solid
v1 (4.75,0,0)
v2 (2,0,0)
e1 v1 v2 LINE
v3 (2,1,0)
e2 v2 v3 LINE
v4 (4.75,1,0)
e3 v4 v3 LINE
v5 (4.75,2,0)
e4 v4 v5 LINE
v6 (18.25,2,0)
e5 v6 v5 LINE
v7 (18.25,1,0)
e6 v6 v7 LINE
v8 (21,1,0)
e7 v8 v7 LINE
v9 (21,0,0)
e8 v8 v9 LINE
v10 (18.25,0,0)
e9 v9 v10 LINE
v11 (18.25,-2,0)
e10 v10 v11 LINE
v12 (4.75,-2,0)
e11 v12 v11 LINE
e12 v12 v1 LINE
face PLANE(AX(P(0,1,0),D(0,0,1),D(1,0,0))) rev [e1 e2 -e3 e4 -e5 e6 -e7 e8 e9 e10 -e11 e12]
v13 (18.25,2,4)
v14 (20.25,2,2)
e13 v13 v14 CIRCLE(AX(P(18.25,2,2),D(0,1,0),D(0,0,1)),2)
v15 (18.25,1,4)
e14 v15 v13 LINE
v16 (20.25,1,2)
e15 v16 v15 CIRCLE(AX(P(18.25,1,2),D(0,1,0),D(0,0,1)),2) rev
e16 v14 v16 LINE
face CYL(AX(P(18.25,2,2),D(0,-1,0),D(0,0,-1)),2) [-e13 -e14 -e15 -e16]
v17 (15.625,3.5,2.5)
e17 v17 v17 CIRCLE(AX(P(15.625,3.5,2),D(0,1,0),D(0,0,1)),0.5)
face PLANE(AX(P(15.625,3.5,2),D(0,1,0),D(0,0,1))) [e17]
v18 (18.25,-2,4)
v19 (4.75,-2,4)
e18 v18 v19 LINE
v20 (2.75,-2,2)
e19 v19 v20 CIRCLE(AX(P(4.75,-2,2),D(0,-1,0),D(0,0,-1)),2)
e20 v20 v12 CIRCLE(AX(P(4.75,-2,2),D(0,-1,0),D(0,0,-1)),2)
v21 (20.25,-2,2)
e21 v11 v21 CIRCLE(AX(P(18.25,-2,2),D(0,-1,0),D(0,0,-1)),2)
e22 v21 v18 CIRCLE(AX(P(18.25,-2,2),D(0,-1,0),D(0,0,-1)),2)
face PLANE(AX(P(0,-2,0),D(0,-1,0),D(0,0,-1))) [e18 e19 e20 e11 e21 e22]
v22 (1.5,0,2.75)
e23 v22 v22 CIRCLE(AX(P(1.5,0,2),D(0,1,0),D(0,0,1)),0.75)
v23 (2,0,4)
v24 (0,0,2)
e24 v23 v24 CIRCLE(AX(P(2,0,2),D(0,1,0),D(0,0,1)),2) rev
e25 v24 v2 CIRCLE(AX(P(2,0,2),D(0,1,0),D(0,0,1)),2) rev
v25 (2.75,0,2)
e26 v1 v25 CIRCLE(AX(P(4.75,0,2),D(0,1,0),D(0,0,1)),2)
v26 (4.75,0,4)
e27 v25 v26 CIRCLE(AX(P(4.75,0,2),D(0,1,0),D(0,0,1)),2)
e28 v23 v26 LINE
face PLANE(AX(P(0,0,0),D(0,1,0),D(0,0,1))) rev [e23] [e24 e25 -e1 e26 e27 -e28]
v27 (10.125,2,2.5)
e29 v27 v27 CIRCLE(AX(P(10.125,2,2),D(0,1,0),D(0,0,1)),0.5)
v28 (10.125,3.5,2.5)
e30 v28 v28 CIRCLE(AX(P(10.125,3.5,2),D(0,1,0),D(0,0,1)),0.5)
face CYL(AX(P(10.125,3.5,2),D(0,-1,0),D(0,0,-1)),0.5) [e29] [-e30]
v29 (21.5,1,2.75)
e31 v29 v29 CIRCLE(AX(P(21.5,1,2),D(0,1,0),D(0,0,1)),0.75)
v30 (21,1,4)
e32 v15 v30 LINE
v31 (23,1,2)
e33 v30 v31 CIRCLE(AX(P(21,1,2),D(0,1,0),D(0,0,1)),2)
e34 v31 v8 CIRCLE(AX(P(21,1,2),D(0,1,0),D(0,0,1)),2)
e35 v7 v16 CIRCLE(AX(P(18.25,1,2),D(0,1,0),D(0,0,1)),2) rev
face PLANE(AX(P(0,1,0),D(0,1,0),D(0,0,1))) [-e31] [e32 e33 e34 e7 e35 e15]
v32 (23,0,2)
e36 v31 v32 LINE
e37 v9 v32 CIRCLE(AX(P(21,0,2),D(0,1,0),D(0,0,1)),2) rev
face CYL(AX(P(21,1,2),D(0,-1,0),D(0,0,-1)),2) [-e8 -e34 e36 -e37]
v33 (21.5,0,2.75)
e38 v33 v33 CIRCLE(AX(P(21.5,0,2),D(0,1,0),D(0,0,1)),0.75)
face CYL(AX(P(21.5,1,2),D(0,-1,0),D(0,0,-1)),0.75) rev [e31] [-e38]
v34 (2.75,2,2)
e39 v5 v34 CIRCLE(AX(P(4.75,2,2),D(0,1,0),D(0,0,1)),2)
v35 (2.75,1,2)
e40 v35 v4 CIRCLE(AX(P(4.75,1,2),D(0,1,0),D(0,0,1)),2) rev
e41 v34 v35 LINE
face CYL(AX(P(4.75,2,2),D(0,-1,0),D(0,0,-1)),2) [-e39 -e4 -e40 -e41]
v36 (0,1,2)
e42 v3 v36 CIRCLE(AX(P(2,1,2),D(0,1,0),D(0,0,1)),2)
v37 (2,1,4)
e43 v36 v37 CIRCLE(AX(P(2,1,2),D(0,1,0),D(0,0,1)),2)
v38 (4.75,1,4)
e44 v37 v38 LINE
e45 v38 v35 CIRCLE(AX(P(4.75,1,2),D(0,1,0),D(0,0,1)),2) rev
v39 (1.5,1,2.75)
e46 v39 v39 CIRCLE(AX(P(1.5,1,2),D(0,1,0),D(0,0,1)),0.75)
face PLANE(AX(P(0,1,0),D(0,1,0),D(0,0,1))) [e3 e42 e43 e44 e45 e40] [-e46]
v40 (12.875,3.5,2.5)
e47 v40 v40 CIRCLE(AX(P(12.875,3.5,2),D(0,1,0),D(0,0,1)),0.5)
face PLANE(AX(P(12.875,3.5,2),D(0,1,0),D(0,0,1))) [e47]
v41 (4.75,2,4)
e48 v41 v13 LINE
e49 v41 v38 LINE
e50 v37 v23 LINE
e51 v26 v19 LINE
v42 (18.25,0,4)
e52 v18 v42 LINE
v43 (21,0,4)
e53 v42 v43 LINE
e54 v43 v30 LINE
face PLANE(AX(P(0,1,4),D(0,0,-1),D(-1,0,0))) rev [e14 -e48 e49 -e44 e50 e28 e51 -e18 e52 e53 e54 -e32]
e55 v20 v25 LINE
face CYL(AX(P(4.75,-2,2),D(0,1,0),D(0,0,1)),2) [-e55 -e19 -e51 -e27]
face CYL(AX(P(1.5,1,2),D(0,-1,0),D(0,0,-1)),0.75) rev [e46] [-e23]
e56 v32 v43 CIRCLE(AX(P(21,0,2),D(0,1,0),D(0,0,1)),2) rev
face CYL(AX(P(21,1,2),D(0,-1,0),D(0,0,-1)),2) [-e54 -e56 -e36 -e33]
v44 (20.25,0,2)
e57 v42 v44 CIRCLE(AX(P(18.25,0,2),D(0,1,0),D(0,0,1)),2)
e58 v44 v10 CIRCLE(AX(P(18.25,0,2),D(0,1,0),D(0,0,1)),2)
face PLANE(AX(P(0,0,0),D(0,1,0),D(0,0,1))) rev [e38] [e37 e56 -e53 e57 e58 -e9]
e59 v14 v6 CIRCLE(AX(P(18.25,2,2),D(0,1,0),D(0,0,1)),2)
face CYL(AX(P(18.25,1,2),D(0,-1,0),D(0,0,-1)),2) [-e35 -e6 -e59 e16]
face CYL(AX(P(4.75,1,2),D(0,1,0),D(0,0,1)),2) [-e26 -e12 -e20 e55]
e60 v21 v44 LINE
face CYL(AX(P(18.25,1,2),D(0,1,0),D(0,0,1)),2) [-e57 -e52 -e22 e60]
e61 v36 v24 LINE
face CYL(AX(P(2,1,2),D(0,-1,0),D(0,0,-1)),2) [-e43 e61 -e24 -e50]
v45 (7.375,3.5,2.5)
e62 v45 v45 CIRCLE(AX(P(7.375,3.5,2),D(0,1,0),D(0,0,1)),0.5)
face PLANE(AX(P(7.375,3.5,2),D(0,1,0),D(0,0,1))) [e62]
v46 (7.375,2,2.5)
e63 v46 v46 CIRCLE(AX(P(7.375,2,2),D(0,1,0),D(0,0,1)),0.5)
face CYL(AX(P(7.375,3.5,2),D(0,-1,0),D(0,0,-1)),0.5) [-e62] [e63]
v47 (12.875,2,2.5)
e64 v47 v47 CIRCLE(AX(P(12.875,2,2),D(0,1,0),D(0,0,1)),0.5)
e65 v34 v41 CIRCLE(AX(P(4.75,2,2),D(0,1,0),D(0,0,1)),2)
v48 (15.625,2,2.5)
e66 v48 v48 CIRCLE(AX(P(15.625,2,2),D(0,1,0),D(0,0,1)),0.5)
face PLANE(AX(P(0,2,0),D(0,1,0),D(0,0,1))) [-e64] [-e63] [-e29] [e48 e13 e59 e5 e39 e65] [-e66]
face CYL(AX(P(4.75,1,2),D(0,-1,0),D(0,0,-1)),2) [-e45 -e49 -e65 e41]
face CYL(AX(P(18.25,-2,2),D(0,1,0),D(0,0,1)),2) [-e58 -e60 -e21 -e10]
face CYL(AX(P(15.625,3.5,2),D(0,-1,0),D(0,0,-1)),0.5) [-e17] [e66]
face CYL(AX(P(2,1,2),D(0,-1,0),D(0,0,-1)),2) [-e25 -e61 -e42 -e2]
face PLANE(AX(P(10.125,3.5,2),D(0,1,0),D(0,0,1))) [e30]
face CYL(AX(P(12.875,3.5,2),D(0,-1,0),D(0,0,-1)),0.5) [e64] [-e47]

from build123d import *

# Parameters (mm, degrees)
SKETCH1_W           = 23
SKETCH1_H           = 4
SKETCH1_R           = 0.75
BOSS_EXTRUDE1_DEPTH = 1
SKETCH2_W           = 17.5
SKETCH2_H           = 4
BOSS_EXTRUDE2_DEPTH = 1
SKETCH3_W           = 17.5
SKETCH3_H           = 4
BOSS_EXTRUDE3_DEPTH = 2
SKETCH4_R           = 0.5
BOSS_EXTRUDE4_DEPTH = 1.5
FILLET1_R           = 2
FILLET2_R           = 2


with BuildPart() as part:
    # Sketch1 → Boss-Extrude1 (new body)
    with BuildSketch(Plane(origin=(0, 0, 0), x_dir=(1, 0, 0), z_dir=(0, 1, 0))):
        with Locations((11.5, -2)):
            Rectangle(SKETCH1_W, SKETCH1_H)
        with Locations(Location((1.5, -2, 0), (0, 0, 270))):
            Circle(SKETCH1_R, mode=Mode.SUBTRACT)
        with Locations(Location((21.5, -2, 0), (0, 0, 270))):
            Circle(SKETCH1_R, mode=Mode.SUBTRACT)
    extrude(amount=BOSS_EXTRUDE1_DEPTH)

    # Sketch2 → Boss-Extrude2 (add)
    with BuildSketch(Plane(origin=(0, 1, 0), x_dir=(1, 0, 0), z_dir=(0, 1, 0))):
        with Locations((11.5, -2)):
            Rectangle(SKETCH2_W, SKETCH2_H)
    extrude(amount=BOSS_EXTRUDE2_DEPTH)

    # Sketch3 → Boss-Extrude3 (add)
    with BuildSketch(Plane(origin=(0, 0, 0), x_dir=(-1, 0, 0), z_dir=(0, -1, 0))):
        with Locations((-11.5, -2)):
            Rectangle(SKETCH3_W, SKETCH3_H)
    extrude(amount=BOSS_EXTRUDE3_DEPTH)

    # Sketch4 → Boss-Extrude4 (add)
    with BuildSketch(Plane(origin=(0, 2, 0), x_dir=(1, 0, 0), z_dir=(0, 1, 0))):
        with Locations(Location((7.375, -2, 0), (0, 0, 270))):
            Circle(SKETCH4_R)
        with Locations(Location((10.125, -2, 0), (0, 0, 270))):
            Circle(SKETCH4_R)
        with Locations(Location((12.875, -2, 0), (0, 0, 270))):
            Circle(SKETCH4_R)
        with Locations(Location((15.625, -2, 0), (0, 0, 270))):
            Circle(SKETCH4_R)
    extrude(amount=BOSS_EXTRUDE4_DEPTH)

    # Fillet1
    fillet1_edges = [part.edges().sort_by_distance(p)[0] for p in [
        (20.25, -1, 4),
        (20.25, -1, 0),
        (20.25, 1.5, 0),
        (20.25, 1.5, 4),
        (2.75, 1.5, 4),
        (2.75, 1.5, 0),
        (2.75, -1, 0),
        (2.75, -1, 4),
    ]]
    fillet(fillet1_edges, radius=FILLET1_R - 0.0001)  # a hair under: the kernel refuses the full size

    # Fillet2
    fillet2_edges = [part.edges().sort_by_distance(p)[0] for p in [
        (0, 0.5, 4),
        (0, 0.5, 0),
        (23, 0.5, 0),
        (23, 0.5, 4),
    ]]
    fillet(fillet2_edges, radius=FILLET2_R - 0.0001)  # a hair under: the kernel refuses the full size


solid = part.part
